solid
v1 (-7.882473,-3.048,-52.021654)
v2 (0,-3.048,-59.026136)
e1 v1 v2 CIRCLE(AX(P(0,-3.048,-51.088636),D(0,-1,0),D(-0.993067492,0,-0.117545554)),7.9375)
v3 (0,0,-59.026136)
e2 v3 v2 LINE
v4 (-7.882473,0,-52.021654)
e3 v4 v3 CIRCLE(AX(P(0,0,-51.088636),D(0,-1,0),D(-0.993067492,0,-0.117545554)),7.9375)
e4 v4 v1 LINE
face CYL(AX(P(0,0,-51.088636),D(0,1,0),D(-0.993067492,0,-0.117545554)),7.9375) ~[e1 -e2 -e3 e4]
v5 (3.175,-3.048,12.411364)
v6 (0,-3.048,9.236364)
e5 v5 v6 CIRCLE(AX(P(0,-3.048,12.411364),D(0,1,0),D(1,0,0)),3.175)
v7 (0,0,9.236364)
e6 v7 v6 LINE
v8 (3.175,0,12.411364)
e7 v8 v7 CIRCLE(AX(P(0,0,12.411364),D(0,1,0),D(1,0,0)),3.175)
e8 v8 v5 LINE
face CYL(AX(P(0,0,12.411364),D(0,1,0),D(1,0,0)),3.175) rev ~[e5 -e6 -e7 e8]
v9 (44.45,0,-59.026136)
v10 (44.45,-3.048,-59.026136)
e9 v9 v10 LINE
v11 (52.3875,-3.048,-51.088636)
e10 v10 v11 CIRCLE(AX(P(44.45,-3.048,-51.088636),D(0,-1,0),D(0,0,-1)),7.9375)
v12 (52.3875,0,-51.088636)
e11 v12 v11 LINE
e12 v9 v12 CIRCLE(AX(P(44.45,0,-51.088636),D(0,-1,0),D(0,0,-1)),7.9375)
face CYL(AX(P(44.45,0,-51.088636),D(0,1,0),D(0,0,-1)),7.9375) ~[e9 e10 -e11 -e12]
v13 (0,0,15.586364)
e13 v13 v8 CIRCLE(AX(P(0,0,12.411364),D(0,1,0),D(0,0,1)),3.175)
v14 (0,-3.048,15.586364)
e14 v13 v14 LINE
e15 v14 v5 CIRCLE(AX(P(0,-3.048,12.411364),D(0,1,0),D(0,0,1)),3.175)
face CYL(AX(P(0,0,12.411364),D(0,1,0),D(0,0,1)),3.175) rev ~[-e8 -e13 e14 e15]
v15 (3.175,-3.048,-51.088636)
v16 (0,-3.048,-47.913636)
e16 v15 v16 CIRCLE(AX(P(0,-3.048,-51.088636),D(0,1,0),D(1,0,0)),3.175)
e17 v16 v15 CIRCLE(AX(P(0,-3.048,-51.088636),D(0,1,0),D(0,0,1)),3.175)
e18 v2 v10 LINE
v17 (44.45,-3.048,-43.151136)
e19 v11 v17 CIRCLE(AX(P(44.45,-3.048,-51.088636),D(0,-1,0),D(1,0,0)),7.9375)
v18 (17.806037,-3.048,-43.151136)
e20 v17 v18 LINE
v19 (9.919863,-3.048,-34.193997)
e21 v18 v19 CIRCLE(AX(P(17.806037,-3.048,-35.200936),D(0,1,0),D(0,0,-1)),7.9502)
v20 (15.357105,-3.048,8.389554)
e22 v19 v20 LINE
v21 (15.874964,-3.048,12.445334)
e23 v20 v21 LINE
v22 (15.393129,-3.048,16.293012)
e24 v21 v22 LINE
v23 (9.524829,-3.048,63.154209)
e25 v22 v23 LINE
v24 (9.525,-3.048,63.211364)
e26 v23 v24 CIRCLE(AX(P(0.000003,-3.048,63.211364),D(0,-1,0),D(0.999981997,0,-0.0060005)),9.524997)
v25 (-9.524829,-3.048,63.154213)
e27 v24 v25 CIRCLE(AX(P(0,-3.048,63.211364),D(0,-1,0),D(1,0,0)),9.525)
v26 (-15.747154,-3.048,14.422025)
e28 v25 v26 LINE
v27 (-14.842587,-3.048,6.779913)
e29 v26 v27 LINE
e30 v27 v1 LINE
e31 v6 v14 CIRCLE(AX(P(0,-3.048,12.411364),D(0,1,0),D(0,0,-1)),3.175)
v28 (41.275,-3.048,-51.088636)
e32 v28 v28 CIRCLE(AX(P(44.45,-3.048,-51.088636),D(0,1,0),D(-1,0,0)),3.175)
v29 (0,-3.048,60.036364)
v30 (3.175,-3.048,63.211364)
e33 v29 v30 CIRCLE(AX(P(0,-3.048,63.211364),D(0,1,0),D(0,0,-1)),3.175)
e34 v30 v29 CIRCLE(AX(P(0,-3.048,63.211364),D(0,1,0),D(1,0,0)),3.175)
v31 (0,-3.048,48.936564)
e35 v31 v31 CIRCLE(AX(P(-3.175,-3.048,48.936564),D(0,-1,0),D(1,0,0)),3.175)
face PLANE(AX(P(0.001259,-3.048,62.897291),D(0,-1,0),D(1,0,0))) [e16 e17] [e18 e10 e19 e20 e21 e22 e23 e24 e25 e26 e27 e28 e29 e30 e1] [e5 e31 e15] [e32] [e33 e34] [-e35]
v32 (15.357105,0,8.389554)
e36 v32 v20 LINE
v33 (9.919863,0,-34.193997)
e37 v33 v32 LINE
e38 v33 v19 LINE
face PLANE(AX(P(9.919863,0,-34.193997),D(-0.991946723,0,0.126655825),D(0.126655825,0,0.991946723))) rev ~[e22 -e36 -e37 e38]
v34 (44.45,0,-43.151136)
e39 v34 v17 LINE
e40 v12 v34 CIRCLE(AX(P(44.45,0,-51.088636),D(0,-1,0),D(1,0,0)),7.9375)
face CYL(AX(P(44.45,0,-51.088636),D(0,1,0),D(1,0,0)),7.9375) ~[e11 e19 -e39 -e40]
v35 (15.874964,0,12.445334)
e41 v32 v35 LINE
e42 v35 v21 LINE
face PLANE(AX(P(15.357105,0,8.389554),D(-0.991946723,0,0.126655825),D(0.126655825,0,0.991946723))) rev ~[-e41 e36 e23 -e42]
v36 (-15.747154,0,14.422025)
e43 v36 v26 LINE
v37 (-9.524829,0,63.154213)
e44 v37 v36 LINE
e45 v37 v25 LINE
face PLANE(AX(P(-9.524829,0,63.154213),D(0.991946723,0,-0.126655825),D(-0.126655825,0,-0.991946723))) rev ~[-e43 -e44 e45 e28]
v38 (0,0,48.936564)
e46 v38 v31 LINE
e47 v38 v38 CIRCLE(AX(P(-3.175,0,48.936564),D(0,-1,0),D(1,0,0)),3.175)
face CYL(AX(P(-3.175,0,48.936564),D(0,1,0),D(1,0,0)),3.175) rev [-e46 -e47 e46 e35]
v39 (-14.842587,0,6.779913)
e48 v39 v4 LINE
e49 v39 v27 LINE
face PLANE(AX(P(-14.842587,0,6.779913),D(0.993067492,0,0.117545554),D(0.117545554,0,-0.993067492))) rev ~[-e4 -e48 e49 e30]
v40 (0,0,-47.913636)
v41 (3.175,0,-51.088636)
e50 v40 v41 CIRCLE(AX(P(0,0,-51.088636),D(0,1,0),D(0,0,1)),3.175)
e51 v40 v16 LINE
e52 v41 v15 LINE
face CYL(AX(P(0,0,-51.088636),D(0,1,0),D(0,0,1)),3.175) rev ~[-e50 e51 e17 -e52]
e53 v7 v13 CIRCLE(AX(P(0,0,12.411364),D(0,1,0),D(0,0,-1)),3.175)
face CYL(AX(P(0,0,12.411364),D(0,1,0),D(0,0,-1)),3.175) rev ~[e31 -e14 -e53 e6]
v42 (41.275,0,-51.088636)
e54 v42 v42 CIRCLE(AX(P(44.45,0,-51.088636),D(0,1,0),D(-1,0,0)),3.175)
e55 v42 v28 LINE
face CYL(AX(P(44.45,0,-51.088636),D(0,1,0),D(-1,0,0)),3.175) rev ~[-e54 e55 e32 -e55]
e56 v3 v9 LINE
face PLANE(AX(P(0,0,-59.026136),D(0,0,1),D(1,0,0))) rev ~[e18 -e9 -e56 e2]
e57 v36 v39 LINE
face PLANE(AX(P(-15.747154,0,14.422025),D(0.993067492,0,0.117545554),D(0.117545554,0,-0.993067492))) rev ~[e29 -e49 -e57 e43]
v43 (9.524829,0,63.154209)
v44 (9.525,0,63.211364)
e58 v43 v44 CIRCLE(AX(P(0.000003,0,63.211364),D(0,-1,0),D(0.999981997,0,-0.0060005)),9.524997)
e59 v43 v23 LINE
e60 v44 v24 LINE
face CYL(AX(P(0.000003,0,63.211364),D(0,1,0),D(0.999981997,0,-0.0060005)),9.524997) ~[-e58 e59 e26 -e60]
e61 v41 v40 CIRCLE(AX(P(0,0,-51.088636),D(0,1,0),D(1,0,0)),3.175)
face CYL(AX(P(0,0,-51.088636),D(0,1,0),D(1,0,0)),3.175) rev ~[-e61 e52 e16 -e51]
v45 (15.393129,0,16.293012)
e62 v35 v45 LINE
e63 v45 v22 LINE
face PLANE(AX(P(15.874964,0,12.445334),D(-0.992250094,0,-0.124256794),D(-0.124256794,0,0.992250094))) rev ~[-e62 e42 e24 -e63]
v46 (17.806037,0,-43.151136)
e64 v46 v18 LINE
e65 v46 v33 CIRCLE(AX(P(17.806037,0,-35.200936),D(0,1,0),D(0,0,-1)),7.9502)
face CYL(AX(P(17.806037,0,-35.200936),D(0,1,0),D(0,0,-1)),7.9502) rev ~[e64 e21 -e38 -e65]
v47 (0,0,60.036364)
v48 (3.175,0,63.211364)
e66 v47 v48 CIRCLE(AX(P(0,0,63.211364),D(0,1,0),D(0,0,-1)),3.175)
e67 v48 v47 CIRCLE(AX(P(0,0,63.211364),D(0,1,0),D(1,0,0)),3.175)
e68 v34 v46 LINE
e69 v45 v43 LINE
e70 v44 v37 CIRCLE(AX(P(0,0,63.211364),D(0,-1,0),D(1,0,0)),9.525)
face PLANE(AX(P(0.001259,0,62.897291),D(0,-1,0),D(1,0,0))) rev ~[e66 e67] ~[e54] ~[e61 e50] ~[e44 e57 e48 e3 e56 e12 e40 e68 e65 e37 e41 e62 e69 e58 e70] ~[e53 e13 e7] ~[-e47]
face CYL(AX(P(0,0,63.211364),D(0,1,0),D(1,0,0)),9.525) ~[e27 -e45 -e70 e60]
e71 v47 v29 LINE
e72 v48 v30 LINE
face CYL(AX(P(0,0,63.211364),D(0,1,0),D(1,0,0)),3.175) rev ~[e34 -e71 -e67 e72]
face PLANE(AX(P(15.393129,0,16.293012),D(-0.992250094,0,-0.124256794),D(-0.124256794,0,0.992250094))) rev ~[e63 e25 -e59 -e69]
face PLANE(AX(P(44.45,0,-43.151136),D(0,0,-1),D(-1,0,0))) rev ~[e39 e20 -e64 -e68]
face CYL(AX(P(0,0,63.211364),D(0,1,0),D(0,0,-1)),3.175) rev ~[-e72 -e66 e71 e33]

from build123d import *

# Parameters (mm, degrees)
F0_R     = 3.175
F1_DEPTH = 3.048


# Not quite as in the source:
# - a feature names something its author has since deleted; it is built from what else it names


with BuildPart() as f1:
    # F0 (on Front) → F1 (new body)
    with BuildSketch(Plane.XZ):
        with BuildLine():
            ThreePointArc((-9.524828548, 63.1542134468), (-6.7149560856, 56.455996051), (0, 53.6863635294))
            ThreePointArc((0, 53.6863635294), (6.7149544249, 56.4559944002), (9.5248285199, 63.1542087637))
            ThreePointArc((9.5248285199, 63.1542087637), (9.5249571299, 63.1827860179), (9.525, 63.2113635294))
            ThreePointArc((9.525, 63.2113635294), (-0.0285751699, 72.7363206663), (-9.524828548, 63.1542134468))
        make_face()
        with BuildLine():
            ThreePointArc((3.175, 63.2113635294), (2.2450640303, 60.9662994992), (0, 60.0363635294))
            ThreePointArc((0, 60.0363635294), (-2.2450640303, 65.4564275597), (3.175, 63.2113635294))
        make_face(mode=Mode.SUBTRACT)
        with BuildLine():
            ThreePointArc((9.5248285199, 63.1542087637), (6.7149544249, 56.4559944002), (0, 53.6863635294))
            Line((0, 53.6863635294), (0, 48.9365635294))
            Line((0, 48.9365635294), (0, 28.2863635294))
            ThreePointArc((0, 28.2863635294), (9.7569068314, 24.9340786537), (15.3931294165, 16.2930116029))
            Line((15.3931294165, 16.2930116029), (9.5248285199, 63.1542087637))
        make_face()
        with BuildLine():
            Line((0, 48.9365635294), (0, 53.6863635294))
            ThreePointArc((0, 53.6863635294), (-6.7149560856, 56.455996051), (-9.524828548, 63.1542134468))
            Line((-9.524828548, 63.1542134468), (-15.7471542329, 14.4220247552))
            ThreePointArc((-15.7471542329, 14.4220247552), (-10.4903855516, 24.3263723829), (0, 28.2863635294))
            Line((0, 28.2863635294), (0, 48.9365635294))
        make_face()
        with Locations((-3.175, 48.9365635294)):
            Circle(F0_R, mode=Mode.SUBTRACT)
        with BuildLine():
            ThreePointArc((15.3931294165, 16.2930116029), (9.7569068314, 24.9340786537), (0, 28.2863635294))
            Line((0, 28.2863635294), (0, 15.5863635294))
            ThreePointArc((0, 15.5863635294), (2.2450640303, 14.6564275597), (3.175, 12.4113635294))
            ThreePointArc((3.175, 12.4113635294), (2.2450640303, 10.1662994992), (0, 9.2363635294))
            Line((0, 9.2363635294), (0, -3.4636364706))
            ThreePointArc((0, -3.4636364706), (9.6997269009, -0.1556935265), (15.3571050572, 8.3895543266))
            Line((15.3571050572, 8.3895543266), (15.8749636535, 12.445334128))
            Line((15.8749636535, 12.445334128), (15.3931294165, 16.2930116029))
        make_face()
        with BuildLine():
            Line((0, 15.5863635294), (0, 28.2863635294))
            ThreePointArc((0, 28.2863635294), (-10.4903855516, 24.3263723829), (-15.7471542329, 14.4220247552))
            Line((-15.7471542329, 14.4220247552), (-14.8425870633, 6.7799130706))
            ThreePointArc((-14.8425870633, 6.7799130706), (-9.017104551, -0.6541426038), (0, -3.4636364706))
            Line((0, -3.4636364706), (0, 9.2363635294))
            ThreePointArc((0, 9.2363635294), (-3.175, 12.4113635294), (0, 15.5863635294))
        make_face()
        with BuildLine():
            ThreePointArc((0, -3.4636364706), (-9.017104551, -0.6541426038), (-14.8425870633, 6.7799130706))
            Line((-14.8425870633, 6.7799130706), (-7.8824732142, -52.0216543038))
            ThreePointArc((-7.8824732142, -52.0216543038), (-5.9333689967, -45.8161571108), (0, -43.1511364706))
            Line((0, -43.1511364706), (0, -3.4636364706))
        make_face()
        with BuildLine():
            ThreePointArc((15.3571050572, 8.3895543266), (9.6997269009, -0.1556935265), (0, -3.4636364706))
            Line((0, -3.4636364706), (0, -43.1511364706))
            ThreePointArc((0, -43.1511364706), (5.6126600757, -45.4759763949), (7.9375, -51.0886364706))
            Line((7.9375, -51.0886364706), (36.5125, -51.0886364706))
            ThreePointArc((36.5125, -51.0886364706), (38.8373399243, -45.4759763949), (44.45, -43.1511364706))
            Line((44.45, -43.1511364706), (17.8060374021, -43.1511364706))
            ThreePointArc((17.8060374021, -43.1511364706), (11.8390009683, -40.4545215548), (9.9198625623, -34.1939973287))
            Line((9.9198625623, -34.1939973287), (15.3571050572, 8.3895543266))
        make_face()
        with BuildLine():
            ThreePointArc((0, -43.1511364706), (-5.9333689967, -45.8161571108), (-7.8824732142, -52.0216543038))
            ThreePointArc((-7.8824732142, -52.0216543038), (-5.2724793598, -57.0220054673), (0, -59.0261364706))
            ThreePointArc((0, -59.0261364706), (5.6126600757, -56.7012965462), (7.9375, -51.0886364706))
            Line((7.9375, -51.0886364706), (3.175, -51.0886364706))
            ThreePointArc((3.175, -51.0886364706), (-2.2450640303, -53.3337005008), (0, -47.9136364706))
            Line((0, -47.9136364706), (0, -43.1511364706))
        make_face()
        with BuildLine():
            ThreePointArc((7.9375, -51.0886364706), (5.6126600757, -45.4759763949), (0, -43.1511364706))
            Line((0, -43.1511364706), (0, -47.9136364706))
            ThreePointArc((0, -47.9136364706), (2.2450640303, -48.8435724403), (3.175, -51.0886364706))
            Line((3.175, -51.0886364706), (7.9375, -51.0886364706))
        make_face()
        with BuildLine():
            ThreePointArc((7.9375, -51.0886364706), (5.6126600757, -56.7012965462), (0, -59.0261364706))
            Line((0, -59.0261364706), (44.45, -59.0261364706))
            ThreePointArc((44.45, -59.0261364706), (38.8373399243, -56.7012965462), (36.5125, -51.0886364706))
            Line((36.5125, -51.0886364706), (7.9375, -51.0886364706))
        make_face()
        with BuildLine():
            ThreePointArc((36.5125, -51.0886364706), (38.8373399243, -56.7012965462), (44.45, -59.0261364706))
            ThreePointArc((44.45, -59.0261364706), (50.0626600757, -56.7012965462), (52.3875, -51.0886364706))
            ThreePointArc((52.3875, -51.0886364706), (50.0626600757, -45.4759763949), (44.45, -43.1511364706))
            ThreePointArc((44.45, -43.1511364706), (38.8373399243, -45.4759763949), (36.5125, -51.0886364706))
        make_face()
        with BuildLine():
            ThreePointArc((47.625, -51.0886364706), (44.45, -54.2636364706), (41.275, -51.0886364706))
            ThreePointArc((41.275, -51.0886364706), (44.45, -47.9136364706), (47.625, -51.0886364706))
        make_face(mode=Mode.SUBTRACT)
    extrude(amount=F1_DEPTH)


solid = f1.part
